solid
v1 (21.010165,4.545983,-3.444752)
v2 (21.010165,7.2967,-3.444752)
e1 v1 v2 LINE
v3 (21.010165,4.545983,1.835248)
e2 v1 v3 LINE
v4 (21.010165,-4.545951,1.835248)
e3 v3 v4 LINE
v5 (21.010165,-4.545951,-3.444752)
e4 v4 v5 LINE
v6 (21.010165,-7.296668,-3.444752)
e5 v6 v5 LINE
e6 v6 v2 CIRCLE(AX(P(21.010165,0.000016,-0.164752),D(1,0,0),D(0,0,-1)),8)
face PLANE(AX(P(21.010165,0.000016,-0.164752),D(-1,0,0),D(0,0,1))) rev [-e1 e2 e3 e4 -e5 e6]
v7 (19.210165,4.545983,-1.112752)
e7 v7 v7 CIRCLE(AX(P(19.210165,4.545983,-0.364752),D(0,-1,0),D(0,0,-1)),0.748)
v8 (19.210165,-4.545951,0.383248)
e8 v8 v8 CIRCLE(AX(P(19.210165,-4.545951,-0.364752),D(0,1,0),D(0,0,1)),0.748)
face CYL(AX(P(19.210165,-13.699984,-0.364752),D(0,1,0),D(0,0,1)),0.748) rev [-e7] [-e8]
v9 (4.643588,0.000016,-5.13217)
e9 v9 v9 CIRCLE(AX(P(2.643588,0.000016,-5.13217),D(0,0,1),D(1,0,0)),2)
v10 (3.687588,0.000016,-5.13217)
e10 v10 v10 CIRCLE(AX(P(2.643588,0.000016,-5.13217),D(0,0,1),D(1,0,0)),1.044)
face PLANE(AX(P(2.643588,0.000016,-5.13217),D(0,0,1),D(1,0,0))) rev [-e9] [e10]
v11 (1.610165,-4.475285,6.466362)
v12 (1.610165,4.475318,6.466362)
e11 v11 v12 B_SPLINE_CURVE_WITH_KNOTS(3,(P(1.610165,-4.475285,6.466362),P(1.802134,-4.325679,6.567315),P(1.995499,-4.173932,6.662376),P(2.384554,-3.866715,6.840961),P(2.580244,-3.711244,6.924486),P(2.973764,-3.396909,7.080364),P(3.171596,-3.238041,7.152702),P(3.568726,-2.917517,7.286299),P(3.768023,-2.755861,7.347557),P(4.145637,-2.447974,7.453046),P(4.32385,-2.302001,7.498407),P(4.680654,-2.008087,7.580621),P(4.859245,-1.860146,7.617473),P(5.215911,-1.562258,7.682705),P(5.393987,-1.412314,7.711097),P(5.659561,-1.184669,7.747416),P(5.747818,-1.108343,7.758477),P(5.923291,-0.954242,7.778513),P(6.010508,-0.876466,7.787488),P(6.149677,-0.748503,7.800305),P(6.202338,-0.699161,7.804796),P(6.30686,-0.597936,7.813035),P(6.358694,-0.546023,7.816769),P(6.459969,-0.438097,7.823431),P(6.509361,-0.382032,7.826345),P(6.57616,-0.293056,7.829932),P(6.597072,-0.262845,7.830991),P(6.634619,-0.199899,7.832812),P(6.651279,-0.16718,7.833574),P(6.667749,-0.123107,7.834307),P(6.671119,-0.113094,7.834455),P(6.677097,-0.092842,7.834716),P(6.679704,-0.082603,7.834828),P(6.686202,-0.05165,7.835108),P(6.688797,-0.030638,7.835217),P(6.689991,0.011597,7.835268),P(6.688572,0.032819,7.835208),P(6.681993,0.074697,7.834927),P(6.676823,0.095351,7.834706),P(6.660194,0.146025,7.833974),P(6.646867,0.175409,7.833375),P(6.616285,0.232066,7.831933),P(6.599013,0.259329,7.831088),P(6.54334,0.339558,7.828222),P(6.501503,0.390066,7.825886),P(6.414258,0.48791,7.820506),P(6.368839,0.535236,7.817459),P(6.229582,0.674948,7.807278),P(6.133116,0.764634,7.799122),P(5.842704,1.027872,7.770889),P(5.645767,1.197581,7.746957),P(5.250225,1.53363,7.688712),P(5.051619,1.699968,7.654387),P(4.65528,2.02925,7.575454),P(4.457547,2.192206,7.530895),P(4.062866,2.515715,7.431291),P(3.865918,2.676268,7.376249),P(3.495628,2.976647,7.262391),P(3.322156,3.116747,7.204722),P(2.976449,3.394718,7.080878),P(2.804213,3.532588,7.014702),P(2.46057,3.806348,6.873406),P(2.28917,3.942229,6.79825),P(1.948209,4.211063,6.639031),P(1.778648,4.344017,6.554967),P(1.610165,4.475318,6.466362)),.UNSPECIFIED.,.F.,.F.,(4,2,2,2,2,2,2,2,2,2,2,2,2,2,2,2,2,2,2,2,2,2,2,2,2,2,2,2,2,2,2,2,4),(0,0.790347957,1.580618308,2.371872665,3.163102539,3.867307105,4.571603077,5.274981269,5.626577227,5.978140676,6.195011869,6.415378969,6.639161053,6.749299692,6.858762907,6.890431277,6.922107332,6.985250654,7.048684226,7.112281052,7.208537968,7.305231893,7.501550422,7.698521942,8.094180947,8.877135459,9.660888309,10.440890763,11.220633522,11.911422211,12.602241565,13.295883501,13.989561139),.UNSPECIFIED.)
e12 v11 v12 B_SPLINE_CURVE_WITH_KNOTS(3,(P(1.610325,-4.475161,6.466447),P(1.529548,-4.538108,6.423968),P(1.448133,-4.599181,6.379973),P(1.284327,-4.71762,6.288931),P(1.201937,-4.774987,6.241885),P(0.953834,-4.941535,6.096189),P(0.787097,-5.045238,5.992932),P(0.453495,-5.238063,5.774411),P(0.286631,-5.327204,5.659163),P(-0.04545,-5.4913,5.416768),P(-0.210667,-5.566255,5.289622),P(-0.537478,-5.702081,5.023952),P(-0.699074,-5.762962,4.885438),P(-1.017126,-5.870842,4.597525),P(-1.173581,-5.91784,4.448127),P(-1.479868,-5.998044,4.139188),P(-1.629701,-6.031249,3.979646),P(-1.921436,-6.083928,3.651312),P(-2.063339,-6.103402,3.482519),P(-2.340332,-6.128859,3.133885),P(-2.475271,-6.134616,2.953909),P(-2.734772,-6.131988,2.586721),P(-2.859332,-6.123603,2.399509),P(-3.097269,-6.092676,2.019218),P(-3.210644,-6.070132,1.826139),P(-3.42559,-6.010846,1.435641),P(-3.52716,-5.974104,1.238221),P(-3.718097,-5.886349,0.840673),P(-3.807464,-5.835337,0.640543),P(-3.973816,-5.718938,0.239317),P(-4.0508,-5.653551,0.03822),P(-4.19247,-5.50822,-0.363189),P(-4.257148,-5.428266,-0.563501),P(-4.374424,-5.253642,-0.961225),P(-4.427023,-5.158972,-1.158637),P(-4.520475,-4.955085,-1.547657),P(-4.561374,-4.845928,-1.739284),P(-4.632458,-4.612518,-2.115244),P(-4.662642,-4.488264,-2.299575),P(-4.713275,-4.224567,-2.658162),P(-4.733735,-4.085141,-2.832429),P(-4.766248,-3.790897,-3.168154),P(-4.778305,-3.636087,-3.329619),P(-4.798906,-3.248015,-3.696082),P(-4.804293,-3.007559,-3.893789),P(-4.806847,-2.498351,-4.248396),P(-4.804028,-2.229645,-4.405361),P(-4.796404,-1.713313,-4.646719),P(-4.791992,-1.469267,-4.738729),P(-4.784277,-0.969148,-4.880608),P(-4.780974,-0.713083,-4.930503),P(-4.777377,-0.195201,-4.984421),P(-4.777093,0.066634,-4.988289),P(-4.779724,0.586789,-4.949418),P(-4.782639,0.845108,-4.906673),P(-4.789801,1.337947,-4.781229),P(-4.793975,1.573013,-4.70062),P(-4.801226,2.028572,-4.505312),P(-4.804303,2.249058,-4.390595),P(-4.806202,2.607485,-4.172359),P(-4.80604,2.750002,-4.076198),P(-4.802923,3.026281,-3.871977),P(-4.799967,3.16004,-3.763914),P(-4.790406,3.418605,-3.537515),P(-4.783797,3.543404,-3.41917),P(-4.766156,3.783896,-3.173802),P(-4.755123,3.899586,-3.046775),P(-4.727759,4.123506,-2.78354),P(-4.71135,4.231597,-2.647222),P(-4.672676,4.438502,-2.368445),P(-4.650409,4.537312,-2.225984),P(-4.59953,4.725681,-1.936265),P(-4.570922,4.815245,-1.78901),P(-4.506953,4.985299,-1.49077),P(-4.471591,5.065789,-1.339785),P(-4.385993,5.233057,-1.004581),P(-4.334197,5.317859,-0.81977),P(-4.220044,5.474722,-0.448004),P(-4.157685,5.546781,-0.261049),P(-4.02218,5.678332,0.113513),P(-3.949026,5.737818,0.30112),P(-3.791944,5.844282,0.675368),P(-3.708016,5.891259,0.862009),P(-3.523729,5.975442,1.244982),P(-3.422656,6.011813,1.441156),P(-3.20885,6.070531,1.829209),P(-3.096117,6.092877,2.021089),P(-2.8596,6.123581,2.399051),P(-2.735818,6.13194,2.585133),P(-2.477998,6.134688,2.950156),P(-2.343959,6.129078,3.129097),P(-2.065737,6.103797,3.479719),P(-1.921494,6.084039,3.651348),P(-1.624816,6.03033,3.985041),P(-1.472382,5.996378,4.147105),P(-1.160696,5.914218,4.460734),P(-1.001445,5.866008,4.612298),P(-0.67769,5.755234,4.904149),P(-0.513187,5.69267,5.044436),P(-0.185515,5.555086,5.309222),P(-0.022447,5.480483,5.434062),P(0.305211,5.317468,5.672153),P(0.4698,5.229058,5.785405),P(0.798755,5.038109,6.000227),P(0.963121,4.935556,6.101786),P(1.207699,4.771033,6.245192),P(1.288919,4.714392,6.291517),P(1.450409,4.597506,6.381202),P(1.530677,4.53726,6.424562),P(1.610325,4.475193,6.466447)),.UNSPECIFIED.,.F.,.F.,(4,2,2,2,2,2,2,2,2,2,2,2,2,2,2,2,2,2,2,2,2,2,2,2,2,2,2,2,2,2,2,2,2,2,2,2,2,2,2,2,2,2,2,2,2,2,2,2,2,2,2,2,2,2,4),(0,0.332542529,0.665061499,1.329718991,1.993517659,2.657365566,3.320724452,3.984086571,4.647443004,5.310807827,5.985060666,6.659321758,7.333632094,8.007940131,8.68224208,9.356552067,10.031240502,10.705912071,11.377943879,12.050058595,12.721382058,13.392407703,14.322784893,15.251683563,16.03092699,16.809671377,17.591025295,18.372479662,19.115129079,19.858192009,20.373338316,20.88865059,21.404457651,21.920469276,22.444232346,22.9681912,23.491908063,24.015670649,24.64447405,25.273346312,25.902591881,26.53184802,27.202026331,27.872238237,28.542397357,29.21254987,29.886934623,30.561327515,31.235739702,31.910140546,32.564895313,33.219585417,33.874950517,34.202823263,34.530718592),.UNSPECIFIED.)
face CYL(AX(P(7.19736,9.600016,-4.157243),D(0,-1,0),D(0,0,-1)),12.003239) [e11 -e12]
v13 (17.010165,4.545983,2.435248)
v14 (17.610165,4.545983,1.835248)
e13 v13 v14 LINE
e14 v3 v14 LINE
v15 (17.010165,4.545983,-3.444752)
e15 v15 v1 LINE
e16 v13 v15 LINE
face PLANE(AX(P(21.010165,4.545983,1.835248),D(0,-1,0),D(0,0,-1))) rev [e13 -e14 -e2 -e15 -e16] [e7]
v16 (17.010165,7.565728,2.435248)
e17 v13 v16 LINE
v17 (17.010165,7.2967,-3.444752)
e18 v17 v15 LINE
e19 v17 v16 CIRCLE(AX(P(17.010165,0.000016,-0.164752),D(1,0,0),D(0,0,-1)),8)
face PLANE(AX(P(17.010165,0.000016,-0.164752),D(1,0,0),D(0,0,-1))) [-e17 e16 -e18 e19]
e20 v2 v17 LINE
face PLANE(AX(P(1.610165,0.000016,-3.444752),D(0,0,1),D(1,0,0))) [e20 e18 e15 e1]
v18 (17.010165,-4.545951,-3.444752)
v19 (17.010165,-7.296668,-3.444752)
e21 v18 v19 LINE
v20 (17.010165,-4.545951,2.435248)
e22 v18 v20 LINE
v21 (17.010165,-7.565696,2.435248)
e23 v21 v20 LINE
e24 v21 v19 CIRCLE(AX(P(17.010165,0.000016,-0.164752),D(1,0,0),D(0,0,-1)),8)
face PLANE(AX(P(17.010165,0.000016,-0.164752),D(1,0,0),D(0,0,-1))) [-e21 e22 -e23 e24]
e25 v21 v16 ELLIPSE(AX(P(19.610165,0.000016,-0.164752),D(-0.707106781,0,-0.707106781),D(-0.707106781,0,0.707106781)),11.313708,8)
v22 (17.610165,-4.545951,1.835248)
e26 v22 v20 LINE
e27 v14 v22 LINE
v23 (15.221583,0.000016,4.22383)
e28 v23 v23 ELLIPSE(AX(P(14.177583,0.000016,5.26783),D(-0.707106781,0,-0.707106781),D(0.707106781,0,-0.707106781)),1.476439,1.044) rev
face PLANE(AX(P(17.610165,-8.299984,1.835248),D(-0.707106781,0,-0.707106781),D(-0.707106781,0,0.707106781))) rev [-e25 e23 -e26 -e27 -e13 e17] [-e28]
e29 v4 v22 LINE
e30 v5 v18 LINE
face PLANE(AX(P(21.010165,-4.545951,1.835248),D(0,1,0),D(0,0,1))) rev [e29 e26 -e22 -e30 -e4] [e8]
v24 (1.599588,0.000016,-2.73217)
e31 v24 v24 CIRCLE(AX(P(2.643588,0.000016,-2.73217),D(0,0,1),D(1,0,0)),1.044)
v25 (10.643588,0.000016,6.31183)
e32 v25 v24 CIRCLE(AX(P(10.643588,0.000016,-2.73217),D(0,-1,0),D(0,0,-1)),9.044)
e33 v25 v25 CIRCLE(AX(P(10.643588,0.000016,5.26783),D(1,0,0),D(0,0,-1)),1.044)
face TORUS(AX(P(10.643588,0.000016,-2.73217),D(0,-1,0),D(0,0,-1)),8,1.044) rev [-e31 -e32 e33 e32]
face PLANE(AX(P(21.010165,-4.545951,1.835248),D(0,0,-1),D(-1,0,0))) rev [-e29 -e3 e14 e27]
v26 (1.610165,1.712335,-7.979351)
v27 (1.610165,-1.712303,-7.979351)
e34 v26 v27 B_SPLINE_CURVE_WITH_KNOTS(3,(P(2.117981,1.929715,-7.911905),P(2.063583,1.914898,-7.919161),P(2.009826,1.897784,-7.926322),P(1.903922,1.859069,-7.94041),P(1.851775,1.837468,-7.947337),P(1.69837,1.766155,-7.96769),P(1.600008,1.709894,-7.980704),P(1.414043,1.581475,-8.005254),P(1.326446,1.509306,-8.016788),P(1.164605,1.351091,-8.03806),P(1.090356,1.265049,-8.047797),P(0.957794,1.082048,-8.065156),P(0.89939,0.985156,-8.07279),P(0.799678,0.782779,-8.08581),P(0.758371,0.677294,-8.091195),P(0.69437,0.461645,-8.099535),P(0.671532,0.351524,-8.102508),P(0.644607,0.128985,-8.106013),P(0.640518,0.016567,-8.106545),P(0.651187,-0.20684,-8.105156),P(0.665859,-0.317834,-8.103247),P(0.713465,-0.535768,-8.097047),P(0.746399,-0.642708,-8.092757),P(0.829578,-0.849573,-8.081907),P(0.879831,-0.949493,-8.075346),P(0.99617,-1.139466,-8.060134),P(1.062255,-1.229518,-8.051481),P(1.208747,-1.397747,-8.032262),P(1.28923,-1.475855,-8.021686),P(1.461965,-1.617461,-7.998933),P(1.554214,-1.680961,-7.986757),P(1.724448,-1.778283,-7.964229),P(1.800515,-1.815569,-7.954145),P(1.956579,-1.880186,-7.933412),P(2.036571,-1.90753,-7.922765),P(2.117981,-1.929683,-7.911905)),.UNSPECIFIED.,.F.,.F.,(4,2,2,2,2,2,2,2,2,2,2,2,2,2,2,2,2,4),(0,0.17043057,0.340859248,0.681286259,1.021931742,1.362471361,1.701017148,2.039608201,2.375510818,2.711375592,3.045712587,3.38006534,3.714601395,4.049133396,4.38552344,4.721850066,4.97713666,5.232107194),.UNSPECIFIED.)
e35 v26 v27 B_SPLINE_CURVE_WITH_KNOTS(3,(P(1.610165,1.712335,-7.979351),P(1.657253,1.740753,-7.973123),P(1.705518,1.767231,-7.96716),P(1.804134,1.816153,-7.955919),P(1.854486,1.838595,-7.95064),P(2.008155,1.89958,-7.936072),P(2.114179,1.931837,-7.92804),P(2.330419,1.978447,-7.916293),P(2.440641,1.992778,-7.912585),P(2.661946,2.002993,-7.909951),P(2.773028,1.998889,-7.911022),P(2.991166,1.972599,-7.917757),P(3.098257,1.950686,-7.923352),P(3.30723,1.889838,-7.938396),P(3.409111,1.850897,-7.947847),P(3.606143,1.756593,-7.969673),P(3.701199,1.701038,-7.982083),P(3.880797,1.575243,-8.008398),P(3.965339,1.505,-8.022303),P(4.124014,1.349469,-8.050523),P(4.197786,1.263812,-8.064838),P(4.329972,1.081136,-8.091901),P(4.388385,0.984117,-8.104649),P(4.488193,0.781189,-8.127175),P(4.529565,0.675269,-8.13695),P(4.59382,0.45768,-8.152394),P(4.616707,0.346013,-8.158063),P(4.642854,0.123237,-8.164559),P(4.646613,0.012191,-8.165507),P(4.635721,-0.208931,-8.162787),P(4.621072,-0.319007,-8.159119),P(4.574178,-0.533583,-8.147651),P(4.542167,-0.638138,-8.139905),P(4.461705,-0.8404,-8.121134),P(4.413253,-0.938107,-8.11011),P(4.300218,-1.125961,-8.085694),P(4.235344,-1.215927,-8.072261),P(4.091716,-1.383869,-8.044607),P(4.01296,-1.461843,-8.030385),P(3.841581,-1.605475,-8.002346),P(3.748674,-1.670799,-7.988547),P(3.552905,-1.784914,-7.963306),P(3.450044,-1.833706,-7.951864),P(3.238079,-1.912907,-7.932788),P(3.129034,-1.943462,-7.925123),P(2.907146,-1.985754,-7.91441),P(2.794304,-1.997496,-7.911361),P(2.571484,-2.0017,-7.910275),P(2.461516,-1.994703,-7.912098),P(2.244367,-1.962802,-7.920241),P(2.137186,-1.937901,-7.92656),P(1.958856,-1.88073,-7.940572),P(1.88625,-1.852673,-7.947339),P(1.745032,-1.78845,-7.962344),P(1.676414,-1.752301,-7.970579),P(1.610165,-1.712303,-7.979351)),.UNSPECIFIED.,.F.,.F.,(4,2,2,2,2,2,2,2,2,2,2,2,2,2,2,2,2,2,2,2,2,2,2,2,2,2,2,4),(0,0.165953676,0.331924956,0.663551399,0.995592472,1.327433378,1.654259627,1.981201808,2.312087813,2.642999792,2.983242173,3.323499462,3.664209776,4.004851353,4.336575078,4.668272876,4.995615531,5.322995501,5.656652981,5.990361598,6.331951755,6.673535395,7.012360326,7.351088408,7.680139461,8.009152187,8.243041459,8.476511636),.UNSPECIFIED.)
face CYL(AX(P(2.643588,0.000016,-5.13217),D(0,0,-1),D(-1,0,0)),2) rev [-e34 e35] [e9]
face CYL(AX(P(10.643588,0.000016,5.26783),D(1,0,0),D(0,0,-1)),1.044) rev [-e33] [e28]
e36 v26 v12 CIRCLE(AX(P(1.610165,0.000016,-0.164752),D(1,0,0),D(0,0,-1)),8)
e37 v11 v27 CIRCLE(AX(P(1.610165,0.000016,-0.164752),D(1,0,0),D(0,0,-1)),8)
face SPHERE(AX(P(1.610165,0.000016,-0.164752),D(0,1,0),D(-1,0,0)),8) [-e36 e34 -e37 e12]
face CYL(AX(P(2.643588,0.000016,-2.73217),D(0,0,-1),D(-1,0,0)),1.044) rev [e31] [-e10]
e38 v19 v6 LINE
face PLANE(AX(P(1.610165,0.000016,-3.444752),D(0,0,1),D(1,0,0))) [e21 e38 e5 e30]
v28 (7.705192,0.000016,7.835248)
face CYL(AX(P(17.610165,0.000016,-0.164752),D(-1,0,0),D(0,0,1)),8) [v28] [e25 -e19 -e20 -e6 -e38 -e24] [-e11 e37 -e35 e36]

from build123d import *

# Parameters (mm, degrees)
SKETCH1_R                = 10
BOSS_EXTRUDE1_DEPTH      = 20
CUT_EXTRUDE10_DEPTH      = 12
CUT_EXTRUDE10_DEPTH_BACK = 12
CUT_SWEEP1_START         = -6.209273082
CUT_SWEEP1_OUTLINE_R     = 1.305
CUT_SWEEP1_DEPTH         = 3
CUT_SWEEP1_START_2       = 11.29177872
CUT_SWEEP1_2_OUTLINE_R   = 1.305
CUT_SWEEP1_2_DEPTH       = 8.70822128
CUT_SWEEP1_3_OUTLINE_R   = 1.305
CUT_SWEEP1_3_ANGLE       = 90
CUT_SWEEP2_START         = -11
CUT_SWEEP2_OUTLINE_R     = 2.5
CUT_SWEEP2_DEPTH         = 4.790726918
SKETCH25_W               = 5
SKETCH25_H               = 11.364916732
BOSS_EXTRUDE3_DEPTH      = 4.25
BOSS_EXTRUDE4_DEPTH      = 4.25
SKETCH27_R               = 0.935
CUT_EXTRUDE11_DEPTH      = 17.125
CUT_EXTRUDE12_START      = -0.75
CUT_EXTRUDE12_DEPTH      = 0.75
CUT_EXTRUDE13_DEPTH      = 10.375
SKETCH30_W               = 5
SKETCH30_H               = 4
CUT_EXTRUDE14_DEPTH      = 1.6
SCALE2_SCALE             = 0.8


with BuildPart() as part:
    # Sketch1 → Boss-Extrude1 (new body)
    with BuildSketch(Plane(origin=(0, 0, 0), x_dir=(0, 0, -1), z_dir=(1, 0, 0))):
        Circle(SKETCH1_R)
    extrude(amount=BOSS_EXTRUDE1_DEPTH)

    # Sketch12 → Revolve1 (revolve)
    with BuildSketch(Plane.XY):
        with BuildLine():
            Line((0, 10), (0, -10))
            ThreePointArc((0, -10), (-10, 0), (0, 10))
        make_face()
    revolve(axis=Axis((0, 10, 0), (0, -1, 0)))

    # Sketch13 → Cut-Extrude10 (cut, two sides: drawn at the far end of the back side and taken through both)
    with BuildSketch(Plane(origin=(0, 0, 0), x_dir=(1, 0, 0), z_dir=(0, 1, 0)).offset(-CUT_EXTRUDE10_DEPTH_BACK)):
        with BuildLine():
            ThreePointArc((-7.984675672, 6.020378262), (-3.764408562, -5.478068678), (7.618784032, -10))
            ThreePointArc((7.618784032, -10), (-7.804645707, -9.413161624), (-7.984675672, 6.020378262))
        make_face()
    extrude(amount=CUT_EXTRUDE10_DEPTH + CUT_EXTRUDE10_DEPTH_BACK, mode=Mode.SUBTRACT)

    # Cut-Sweep1: read off the stored shape, not the designer's step
    # Cut-Sweep1 outline → Cut-Sweep1 (cut)
    with BuildSketch(Plane.XY.offset(CUT_SWEEP1_START)):
        with Locations((1.29177882, 0)):
            Circle(CUT_SWEEP1_OUTLINE_R)
    extrude(amount=CUT_SWEEP1_DEPTH, mode=Mode.SUBTRACT)

    # Cut-Sweep1 2 outline → Cut-Sweep1 2 (cut)
    with BuildSketch(Plane.YZ.offset(CUT_SWEEP1_START_2)):
        with Locations((0, 6.790726918)):
            Circle(CUT_SWEEP1_2_OUTLINE_R)
    extrude(amount=CUT_SWEEP1_2_DEPTH, mode=Mode.SUBTRACT)

    # Cut-Sweep1 3 outline → Cut-Sweep1 3 (revolve, cut)
    with BuildSketch(Plane(origin=(11.29177882, 0, -3.209273082), x_dir=(-1, 0, 0), z_dir=(0, 0, -1))):
        with Locations((10, 0)):
            Circle(CUT_SWEEP1_3_OUTLINE_R)
    revolve(axis=Axis((11.29177882, 0, -3.209273082), (0, 1, 0)), revolution_arc=CUT_SWEEP1_3_ANGLE, mode=Mode.SUBTRACT)

    # Cut-Sweep2: read off the stored shape, not the designer's step
    # Cut-Sweep2 outline → Cut-Sweep2 (cut)
    with BuildSketch(Plane.XY.offset(CUT_SWEEP2_START)):
        with Locations((1.29177882, 0)):
            Circle(CUT_SWEEP2_OUTLINE_R)
    extrude(amount=CUT_SWEEP2_DEPTH, mode=Mode.SUBTRACT)

    # Sketch25 → Boss-Extrude3 (add)
    with BuildSketch(Plane(origin=(20, 0, 0), x_dir=(0, 0, -1), z_dir=(1, 0, 0))):
        Rectangle(SKETCH25_W, SKETCH25_H)
    extrude(amount=BOSS_EXTRUDE3_DEPTH)

    # Sketch26 → Boss-Extrude4 (add)
    with BuildSketch(Plane(origin=(20, 0, 0), x_dir=(0, 0, -1), z_dir=(1, 0, 0))):
        with BuildLine():
            Line((2.5, -9.682458366), (2.5, 9.682458366))
            ThreePointArc((2.5, 9.682458366), (10, 0), (2.5, -9.682458366))
        make_face()
    extrude(amount=BOSS_EXTRUDE4_DEPTH)

    # Sketch27 → Cut-Extrude11 (cut, symmetric)
    with BuildSketch(Plane(origin=(0, 0, 0), x_dir=(1, 0, 0), z_dir=(0, 1, 0))):
        with Locations(Location((22, 0.25, 0), (0, 0, 270))):
            Circle(SKETCH27_R)
    extrude(amount=CUT_EXTRUDE11_DEPTH, both=True, mode=Mode.SUBTRACT)

    # Sketch28 → Cut-Extrude12 (cut)
    with BuildSketch(Plane(origin=(20, 0, 0), x_dir=(0, 0, -1), z_dir=(1, 0, 0)).offset(CUT_EXTRUDE12_START)):
        with BuildLine():
            Line((2.5, -9.682458366), (2.5, -5.682458366))
            Line((2.5, -5.682458366), (-8.228588392, -5.682458366))
            ThreePointArc((-8.228588392, -5.682458366), (-3.493448331, -9.369942303), (2.5, -9.682458366))
        make_face()
        with BuildLine():
            Line((-8.228588392, 5.682458366), (2.5, 5.682458366))
            Line((2.5, 5.682458366), (2.5, 9.682458366))
            ThreePointArc((2.5, 9.682458366), (-3.493448331, 9.369942303), (-8.228588392, 5.682458366))
        make_face()
    extrude(amount=CUT_EXTRUDE12_DEPTH, mode=Mode.SUBTRACT)

    # Sketch29 → Cut-Extrude13 (cut, symmetric)
    with BuildSketch(Plane(origin=(0, 0, 0), x_dir=(1, 0, 0), z_dir=(0, 1, 0))):
        Polygon((20, -8.228588392), (20, -2.5), (12.5, -10), (20, -10), align=None)
    extrude(amount=CUT_EXTRUDE13_DEPTH, both=True, mode=Mode.SUBTRACT)

    # Sketch30 → Cut-Extrude14 (cut)
    with BuildSketch(Plane.XY.offset(-2.5)):
        with Locations((21.75, 7.682458366)):
            Rectangle(SKETCH30_W, SKETCH30_H)
        with Locations((21.75, -7.682458366)):
            Rectangle(SKETCH30_W, SKETCH30_H)
    extrude(amount=-CUT_EXTRUDE14_DEPTH, mode=Mode.SUBTRACT)


with BuildPart() as part_1:
    # Scale2: scaled about (8.050299805, 3.9953e-05, -0.823625188)
    add(part.part.scale(SCALE2_SCALE).moved(Location((1.610059961, 7.991e-06, -0.164725038))))


solid = part_1.part
